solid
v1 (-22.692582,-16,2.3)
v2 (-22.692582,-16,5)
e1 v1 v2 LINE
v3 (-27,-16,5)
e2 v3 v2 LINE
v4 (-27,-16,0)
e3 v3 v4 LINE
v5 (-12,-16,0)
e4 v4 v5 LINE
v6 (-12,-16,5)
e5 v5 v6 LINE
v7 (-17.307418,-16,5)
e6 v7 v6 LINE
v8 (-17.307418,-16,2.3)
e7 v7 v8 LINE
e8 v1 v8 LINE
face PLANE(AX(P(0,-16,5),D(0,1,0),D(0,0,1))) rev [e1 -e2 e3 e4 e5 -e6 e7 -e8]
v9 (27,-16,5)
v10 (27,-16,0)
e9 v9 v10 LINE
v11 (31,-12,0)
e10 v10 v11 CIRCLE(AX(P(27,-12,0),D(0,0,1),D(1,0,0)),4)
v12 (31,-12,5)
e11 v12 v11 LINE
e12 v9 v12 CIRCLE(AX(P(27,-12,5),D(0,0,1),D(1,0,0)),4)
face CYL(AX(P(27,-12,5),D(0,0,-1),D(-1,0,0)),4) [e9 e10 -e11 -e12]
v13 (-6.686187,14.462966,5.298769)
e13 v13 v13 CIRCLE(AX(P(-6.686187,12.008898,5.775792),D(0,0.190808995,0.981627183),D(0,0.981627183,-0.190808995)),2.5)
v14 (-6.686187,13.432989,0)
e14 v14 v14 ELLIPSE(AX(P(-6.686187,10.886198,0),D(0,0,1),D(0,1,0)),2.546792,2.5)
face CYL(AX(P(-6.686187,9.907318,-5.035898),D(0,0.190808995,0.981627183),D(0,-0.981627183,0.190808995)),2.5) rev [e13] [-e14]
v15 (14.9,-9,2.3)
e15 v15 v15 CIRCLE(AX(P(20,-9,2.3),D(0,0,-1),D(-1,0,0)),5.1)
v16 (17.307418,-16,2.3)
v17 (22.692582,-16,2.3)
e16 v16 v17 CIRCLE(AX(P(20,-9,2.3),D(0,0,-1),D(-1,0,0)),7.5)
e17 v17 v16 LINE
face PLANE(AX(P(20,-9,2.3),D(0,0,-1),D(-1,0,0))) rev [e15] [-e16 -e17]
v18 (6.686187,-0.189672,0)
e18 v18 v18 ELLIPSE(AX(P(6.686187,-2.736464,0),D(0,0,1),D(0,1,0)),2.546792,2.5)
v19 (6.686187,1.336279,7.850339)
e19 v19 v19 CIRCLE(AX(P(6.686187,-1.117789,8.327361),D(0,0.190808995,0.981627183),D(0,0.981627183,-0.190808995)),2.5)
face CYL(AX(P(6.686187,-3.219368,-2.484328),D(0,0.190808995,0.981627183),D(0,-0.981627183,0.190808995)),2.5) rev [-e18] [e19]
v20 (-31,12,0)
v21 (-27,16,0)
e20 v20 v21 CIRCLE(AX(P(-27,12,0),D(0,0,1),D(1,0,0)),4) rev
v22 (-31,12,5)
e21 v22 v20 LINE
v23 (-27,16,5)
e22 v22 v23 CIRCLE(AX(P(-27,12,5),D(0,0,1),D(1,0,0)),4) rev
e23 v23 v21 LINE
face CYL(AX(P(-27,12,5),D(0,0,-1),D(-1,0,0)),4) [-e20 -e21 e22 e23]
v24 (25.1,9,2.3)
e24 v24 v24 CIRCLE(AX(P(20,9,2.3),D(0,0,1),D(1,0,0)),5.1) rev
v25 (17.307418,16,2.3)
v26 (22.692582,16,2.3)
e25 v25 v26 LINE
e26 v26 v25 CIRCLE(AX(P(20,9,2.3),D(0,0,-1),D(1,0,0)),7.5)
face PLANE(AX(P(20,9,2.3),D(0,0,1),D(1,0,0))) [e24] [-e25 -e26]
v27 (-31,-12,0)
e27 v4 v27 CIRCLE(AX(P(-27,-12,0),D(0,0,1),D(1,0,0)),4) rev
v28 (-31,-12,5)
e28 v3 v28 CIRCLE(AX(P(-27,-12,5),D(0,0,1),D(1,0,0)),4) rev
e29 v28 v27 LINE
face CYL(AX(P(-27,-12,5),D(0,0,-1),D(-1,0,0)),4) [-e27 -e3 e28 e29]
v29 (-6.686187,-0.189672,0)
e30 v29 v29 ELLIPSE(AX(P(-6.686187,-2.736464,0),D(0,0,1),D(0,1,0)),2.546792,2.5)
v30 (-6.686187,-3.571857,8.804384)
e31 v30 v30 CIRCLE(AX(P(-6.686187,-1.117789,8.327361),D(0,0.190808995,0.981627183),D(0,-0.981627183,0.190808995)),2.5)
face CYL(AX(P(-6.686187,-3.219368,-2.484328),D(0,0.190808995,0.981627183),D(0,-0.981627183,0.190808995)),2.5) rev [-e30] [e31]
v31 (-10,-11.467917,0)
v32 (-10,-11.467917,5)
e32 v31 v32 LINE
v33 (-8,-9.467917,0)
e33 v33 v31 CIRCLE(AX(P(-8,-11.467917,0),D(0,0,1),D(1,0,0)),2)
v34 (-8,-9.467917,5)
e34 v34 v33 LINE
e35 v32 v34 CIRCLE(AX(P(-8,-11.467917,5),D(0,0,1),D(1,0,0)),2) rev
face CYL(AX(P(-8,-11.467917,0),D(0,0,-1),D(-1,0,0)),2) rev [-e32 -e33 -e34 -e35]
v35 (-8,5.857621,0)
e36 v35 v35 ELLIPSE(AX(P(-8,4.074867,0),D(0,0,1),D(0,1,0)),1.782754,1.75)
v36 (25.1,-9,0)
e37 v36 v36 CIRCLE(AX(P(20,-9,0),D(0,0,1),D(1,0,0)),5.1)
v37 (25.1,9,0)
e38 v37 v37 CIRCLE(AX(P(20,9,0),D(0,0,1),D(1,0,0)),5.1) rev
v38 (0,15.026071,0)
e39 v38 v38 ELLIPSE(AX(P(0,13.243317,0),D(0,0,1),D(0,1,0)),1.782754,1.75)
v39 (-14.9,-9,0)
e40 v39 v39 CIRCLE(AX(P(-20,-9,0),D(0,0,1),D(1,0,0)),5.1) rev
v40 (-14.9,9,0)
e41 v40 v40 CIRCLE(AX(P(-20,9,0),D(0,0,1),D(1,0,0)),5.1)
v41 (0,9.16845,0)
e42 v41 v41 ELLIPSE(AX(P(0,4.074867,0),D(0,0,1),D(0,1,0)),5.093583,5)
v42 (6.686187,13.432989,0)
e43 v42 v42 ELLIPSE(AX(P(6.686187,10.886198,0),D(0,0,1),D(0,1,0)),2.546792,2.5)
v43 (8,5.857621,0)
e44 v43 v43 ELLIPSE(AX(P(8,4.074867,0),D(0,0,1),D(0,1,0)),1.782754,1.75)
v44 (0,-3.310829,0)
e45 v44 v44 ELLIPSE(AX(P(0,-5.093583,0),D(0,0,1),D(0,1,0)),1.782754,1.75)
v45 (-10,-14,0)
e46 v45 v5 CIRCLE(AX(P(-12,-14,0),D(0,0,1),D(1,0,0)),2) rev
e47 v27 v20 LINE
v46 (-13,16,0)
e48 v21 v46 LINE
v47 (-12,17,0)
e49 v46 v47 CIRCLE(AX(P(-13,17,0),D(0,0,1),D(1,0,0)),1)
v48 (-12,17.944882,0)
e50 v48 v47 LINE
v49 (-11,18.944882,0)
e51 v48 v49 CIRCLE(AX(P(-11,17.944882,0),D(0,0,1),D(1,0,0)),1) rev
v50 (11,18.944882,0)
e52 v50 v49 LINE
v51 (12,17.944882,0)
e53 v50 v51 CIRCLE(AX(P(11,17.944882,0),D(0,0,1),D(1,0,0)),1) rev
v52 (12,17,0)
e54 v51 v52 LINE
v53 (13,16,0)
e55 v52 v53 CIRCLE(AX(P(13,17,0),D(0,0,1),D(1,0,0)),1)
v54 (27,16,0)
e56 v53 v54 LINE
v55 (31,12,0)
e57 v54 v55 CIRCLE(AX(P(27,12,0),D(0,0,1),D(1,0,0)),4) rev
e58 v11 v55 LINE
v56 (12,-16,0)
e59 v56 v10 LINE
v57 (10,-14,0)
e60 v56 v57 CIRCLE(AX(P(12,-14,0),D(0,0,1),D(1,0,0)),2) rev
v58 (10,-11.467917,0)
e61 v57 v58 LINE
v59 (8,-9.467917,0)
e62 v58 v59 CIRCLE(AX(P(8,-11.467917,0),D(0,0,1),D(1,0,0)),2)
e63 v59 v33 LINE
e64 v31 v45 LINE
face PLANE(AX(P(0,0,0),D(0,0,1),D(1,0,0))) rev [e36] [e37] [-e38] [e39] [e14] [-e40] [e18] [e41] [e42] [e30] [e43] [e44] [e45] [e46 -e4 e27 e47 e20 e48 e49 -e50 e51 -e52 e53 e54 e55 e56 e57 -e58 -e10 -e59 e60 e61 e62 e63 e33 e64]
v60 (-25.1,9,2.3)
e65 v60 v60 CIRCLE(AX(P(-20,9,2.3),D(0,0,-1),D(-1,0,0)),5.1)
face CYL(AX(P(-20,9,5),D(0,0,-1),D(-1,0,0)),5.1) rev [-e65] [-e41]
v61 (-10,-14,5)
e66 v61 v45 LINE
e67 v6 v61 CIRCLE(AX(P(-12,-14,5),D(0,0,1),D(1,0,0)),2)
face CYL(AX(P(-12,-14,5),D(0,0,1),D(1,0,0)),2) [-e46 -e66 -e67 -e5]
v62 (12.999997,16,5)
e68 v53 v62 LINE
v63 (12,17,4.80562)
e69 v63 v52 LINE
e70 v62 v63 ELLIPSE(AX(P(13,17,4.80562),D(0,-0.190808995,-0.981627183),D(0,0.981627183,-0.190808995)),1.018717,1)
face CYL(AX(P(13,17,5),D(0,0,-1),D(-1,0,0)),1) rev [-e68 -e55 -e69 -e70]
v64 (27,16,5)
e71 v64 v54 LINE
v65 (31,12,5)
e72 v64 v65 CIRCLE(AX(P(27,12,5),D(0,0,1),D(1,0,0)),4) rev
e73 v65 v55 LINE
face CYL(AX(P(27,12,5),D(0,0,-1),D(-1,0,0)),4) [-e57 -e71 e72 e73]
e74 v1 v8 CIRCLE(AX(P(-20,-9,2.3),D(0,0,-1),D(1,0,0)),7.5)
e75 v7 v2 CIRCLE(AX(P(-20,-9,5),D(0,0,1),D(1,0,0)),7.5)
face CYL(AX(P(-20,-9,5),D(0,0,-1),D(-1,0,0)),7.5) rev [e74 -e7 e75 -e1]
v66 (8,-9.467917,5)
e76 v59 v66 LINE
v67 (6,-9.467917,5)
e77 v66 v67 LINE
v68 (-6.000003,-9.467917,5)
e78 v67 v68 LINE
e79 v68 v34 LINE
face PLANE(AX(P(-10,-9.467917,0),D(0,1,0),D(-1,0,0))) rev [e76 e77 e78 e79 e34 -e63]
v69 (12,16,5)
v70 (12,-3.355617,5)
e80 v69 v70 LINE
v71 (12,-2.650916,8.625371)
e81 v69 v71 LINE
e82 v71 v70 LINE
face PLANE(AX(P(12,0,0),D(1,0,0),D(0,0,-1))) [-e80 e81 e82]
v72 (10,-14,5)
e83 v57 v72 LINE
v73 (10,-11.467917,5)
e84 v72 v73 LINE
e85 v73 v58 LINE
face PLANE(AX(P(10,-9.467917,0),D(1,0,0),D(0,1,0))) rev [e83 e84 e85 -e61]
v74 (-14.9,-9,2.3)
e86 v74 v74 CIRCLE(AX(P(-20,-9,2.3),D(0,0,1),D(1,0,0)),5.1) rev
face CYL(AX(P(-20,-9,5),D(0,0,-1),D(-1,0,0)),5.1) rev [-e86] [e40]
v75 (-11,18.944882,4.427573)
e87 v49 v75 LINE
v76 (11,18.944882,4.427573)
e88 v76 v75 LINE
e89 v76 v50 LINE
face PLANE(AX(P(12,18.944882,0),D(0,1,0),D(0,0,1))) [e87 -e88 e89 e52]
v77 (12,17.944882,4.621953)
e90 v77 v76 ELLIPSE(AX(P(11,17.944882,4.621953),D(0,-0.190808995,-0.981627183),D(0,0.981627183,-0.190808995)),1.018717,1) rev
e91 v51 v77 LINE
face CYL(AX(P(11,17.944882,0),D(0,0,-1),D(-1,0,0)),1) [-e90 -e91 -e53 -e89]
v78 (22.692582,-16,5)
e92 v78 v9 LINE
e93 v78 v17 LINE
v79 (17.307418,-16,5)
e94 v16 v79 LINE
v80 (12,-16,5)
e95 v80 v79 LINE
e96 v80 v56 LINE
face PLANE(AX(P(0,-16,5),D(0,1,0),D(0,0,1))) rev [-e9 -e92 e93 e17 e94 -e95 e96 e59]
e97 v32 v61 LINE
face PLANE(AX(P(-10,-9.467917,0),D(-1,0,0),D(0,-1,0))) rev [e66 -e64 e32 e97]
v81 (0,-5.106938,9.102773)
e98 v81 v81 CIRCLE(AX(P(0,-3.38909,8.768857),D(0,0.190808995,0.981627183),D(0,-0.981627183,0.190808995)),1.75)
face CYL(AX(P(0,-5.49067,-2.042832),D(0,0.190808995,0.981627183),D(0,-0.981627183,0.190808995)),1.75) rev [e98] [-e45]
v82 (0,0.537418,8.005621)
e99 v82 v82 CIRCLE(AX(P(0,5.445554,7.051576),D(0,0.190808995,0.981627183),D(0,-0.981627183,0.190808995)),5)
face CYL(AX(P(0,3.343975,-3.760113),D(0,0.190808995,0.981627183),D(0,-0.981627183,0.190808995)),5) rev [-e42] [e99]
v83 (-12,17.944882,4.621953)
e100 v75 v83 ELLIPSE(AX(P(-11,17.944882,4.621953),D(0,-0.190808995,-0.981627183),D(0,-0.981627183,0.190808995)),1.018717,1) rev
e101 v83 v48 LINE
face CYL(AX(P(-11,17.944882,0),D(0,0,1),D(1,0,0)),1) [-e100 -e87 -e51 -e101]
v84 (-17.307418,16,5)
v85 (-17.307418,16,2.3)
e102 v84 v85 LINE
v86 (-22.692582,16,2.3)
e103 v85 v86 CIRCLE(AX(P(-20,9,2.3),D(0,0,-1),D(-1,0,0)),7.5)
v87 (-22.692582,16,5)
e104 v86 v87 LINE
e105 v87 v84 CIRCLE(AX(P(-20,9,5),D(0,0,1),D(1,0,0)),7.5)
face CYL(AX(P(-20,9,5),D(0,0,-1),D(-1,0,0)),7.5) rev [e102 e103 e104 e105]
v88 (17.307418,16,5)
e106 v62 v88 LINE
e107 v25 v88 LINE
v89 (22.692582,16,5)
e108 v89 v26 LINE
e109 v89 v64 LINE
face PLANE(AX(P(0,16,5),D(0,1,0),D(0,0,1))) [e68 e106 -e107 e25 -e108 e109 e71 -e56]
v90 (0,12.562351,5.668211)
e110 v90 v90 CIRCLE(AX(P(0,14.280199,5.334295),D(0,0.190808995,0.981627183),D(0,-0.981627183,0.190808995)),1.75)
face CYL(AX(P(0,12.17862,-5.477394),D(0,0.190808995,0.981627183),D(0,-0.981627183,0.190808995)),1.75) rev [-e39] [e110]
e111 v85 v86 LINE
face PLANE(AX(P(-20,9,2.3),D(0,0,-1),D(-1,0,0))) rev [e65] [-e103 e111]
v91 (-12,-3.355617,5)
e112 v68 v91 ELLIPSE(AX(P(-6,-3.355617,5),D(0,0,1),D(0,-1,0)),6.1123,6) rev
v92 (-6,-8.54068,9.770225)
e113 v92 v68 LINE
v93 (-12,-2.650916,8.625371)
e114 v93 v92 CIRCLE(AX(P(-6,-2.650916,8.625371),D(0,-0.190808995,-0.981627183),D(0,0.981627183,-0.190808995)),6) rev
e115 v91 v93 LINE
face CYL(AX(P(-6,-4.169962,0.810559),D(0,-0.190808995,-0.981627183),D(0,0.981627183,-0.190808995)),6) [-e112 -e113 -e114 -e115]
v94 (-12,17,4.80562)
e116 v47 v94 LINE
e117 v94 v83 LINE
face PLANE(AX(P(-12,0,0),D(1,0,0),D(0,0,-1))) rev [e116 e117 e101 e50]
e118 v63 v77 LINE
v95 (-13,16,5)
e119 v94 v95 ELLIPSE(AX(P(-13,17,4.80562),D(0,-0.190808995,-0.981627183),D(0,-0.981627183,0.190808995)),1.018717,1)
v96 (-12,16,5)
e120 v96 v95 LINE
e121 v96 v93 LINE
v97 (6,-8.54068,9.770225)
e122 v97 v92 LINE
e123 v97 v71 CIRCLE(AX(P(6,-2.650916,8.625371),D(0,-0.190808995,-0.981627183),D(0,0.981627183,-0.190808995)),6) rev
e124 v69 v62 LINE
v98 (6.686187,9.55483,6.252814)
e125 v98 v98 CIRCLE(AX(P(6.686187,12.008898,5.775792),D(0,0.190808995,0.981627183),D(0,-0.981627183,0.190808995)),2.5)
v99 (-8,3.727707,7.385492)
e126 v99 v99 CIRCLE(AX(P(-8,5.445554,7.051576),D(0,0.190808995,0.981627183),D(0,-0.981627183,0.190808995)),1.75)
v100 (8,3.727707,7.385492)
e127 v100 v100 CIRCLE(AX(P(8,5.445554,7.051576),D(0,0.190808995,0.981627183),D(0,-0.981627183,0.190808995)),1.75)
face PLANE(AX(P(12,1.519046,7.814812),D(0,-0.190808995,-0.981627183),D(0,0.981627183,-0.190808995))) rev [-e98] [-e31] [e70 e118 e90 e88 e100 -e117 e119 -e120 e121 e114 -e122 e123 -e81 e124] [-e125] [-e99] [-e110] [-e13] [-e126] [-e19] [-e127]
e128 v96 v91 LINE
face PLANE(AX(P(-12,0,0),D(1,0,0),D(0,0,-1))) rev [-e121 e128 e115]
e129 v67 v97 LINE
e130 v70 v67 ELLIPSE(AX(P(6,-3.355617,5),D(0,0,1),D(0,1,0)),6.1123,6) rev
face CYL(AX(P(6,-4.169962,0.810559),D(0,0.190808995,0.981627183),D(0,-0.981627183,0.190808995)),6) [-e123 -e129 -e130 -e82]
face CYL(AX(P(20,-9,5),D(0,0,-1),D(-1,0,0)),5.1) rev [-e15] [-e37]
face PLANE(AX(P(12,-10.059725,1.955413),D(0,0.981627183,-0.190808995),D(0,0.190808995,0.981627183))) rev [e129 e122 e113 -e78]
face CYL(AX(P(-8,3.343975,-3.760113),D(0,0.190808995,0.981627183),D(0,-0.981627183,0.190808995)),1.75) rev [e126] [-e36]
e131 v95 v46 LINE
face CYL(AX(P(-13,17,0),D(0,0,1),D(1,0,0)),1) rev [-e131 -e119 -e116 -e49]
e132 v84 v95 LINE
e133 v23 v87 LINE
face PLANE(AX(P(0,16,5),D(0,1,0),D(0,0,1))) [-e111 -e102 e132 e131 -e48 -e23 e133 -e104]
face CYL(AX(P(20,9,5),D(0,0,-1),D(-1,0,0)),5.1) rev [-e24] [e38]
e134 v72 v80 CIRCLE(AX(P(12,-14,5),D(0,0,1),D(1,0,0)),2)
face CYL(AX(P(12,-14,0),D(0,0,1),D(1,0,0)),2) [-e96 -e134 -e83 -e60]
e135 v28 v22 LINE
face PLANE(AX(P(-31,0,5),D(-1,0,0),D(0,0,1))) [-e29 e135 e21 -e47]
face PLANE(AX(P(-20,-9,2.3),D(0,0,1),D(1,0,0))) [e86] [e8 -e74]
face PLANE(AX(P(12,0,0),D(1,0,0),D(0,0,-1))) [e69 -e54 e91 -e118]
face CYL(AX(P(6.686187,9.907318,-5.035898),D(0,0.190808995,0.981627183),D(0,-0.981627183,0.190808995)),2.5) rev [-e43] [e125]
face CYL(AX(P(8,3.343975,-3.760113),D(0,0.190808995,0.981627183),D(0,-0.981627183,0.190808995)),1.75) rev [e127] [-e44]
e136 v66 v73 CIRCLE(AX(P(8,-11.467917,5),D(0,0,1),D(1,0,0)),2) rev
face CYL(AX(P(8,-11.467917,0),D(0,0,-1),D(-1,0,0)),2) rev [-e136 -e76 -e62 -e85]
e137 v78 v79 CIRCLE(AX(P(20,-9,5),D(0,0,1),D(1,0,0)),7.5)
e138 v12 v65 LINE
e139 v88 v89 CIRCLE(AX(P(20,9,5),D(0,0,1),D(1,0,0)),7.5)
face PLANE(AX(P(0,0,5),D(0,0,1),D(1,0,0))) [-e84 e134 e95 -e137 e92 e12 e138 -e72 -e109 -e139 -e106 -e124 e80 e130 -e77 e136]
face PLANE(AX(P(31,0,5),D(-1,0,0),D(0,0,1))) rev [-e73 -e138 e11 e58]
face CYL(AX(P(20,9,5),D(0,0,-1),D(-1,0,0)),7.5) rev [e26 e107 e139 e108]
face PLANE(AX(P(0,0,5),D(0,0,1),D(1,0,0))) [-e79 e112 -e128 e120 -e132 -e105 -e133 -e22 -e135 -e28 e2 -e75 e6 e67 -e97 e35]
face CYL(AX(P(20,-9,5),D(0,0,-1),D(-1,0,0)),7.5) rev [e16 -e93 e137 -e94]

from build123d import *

# Parameters (mm, degrees)
SKETCH1_R           = 5.1
BOSS_EXTRUDE1_DEPTH = 5
CUT_EXTRUDE1_START  = -2.3
SKETCH2_R           = 7.5
CUT_EXTRUDE1_DEPTH  = 33.942020373
BOSS_EXTRUDE2_DEPTH = 12
SKETCH4_R           = 5
SKETCH4_R_2         = 1.75
SKETCH4_R_3         = 2.5
CUT_EXTRUDE2_DEPTH  = 37.455291152
FILLET1_R           = 1
SKETCH5_W           = 20
SKETCH5_H           = 6.532082626
CUT_EXTRUDE3_DEPTH  = 37.672994655
FILLET2_R           = 2
FILLET3_R           = 6


with BuildPart() as part:
    # Sketch1 → Boss-Extrude1 (new body)
    with BuildSketch(Plane.XY):
        with BuildLine():
            Line((-27, -16), (27, -16))
            ThreePointArc((27, -16), (29.828427125, -14.828427125), (31, -12))
            Line((31, -12), (31, 12))
            ThreePointArc((31, 12), (29.828427125, 14.828427125), (27, 16))
            Line((27, 16), (-27, 16))
            ThreePointArc((-27, 16), (-29.828427125, 14.828427125), (-31, 12))
            Line((-31, 12), (-31, -12))
            ThreePointArc((-31, -12), (-29.828427125, -14.828427125), (-27, -16))
        make_face()
        with Locations((-20, 9)):
            Circle(SKETCH1_R, mode=Mode.SUBTRACT)
        with Locations((20, -9)):
            Circle(SKETCH1_R, mode=Mode.SUBTRACT)
        with Locations((-20, -9)):
            Circle(SKETCH1_R, mode=Mode.SUBTRACT)
        with Locations((20, 9)):
            Circle(SKETCH1_R, mode=Mode.SUBTRACT)
    extrude(amount=BOSS_EXTRUDE1_DEPTH)

    # Sketch2 → Cut-Extrude1 (cut, through all)
    with BuildSketch(Plane(origin=(0, 0, 0), x_dir=(-1, 0, 0), z_dir=(0, 0, -1)).offset(CUT_EXTRUDE1_START)):
        with Locations((20, 9)):
            Circle(SKETCH2_R)
        with Locations((-20, 9)):
            Circle(SKETCH2_R)
        with Locations((-20, -9)):
            Circle(SKETCH2_R)
        with Locations((20, -9)):
            Circle(SKETCH2_R)
    extrude(amount=-CUT_EXTRUDE1_DEPTH, mode=Mode.SUBTRACT)

    # Sketch3 → Boss-Extrude2 (add, symmetric)
    with BuildSketch(Plane(origin=(0, 0, 0), x_dir=(0, 0, -1), z_dir=(1, 0, 0))):
        Polygon((-5, 16), (-9.770224884, -8.540679586), (-5, -9.467917374), align=None)
        Polygon((0, 16), (-5, 16), (-4.427573014, 18.94488155), (0, 18.94488155), align=None)
    extrude(amount=BOSS_EXTRUDE2_DEPTH, both=True)

    # Sketch4 → Cut-Extrude2 (cut, through all)
    with BuildSketch(Plane(origin=(0, 1.519045647, 7.814812384), x_dir=(1, 0, 0), z_dir=(0, 0.19080899537654522, 0.981627183447664))):
        with Locations(Location((0, 4, 0), (0, 0, 270))):
            Circle(SKETCH4_R)
        with Locations(Location((0, 13, 0), (0, 0, 270))):
            Circle(SKETCH4_R_2)
        with Locations(Location((8, 4, 0), (0, 0, 270))):
            Circle(SKETCH4_R_2)
        with Locations(Location((0, -5, 0), (0, 0, 270))):
            Circle(SKETCH4_R_2)
        with Locations(Location((-8, 4, 0), (0, 0, 270))):
            Circle(SKETCH4_R_2)
        with Locations(Location((-6.686187475, -2.686187475, 0), (0, 0, 270))):
            Circle(SKETCH4_R_3)
        with Locations(Location((6.686187475, -2.686187475, 0), (0, 0, 90))):
            Circle(SKETCH4_R_3)
        with Locations(Location((6.686187475, 10.686187475, 0), (0, 0, 270))):
            Circle(SKETCH4_R_3)
        with Locations(Location((-6.686187475, 10.686187475, 0), (0, 0, 90))):
            Circle(SKETCH4_R_3)
    extrude(amount=-CUT_EXTRUDE2_DEPTH, mode=Mode.SUBTRACT)

    # Fillet1
    # the kernel refuses this fillet: 1 mm, written as the material it adds along each edge
    with BuildSketch(Plane(origin=(12, 16, 0), x_dir=(1, 0, 0), z_dir=(0, 0, 1))) as fillet1_piece_1_section:
        with BuildLine():
            CenterArc((FILLET1_R, FILLET1_R), FILLET1_R, 180, 90)
            Line((0, FILLET1_R), (0, 0))
            Line((0, 0), (FILLET1_R, 0))
        make_face()
    fillet1_piece_1 = extrude(amount=5, mode=Mode.PRIVATE)
    fillet1_piece_1 = split(fillet1_piece_1, bisect_by=Plane(origin=(12.227463764, 16.688764384, 4.866117766), z_dir=(0, -0.19080899537654517, -0.981627183447664)), keep=Keep.TOP, mode=Mode.PRIVATE)
    add(fillet1_piece_1)
    with BuildSketch(Plane(origin=(-12, 16, 0), x_dir=(-1, 0, 0), z_dir=(0, 0, 1))) as fillet1_piece_2_section:
        with BuildLine():
            CenterArc((FILLET1_R, -FILLET1_R), FILLET1_R, 90, 90)
            Line((0, -FILLET1_R), (0, 0))
            Line((0, 0), (FILLET1_R, 0))
        make_face()
    fillet1_piece_2 = extrude(amount=5, mode=Mode.PRIVATE)
    fillet1_piece_2 = split(fillet1_piece_2, bisect_by=Plane(origin=(-12.227463764, 16.688764384, 4.866117766), z_dir=(0, -0.19080899537654517, -0.981627183447664)), keep=Keep.TOP, mode=Mode.PRIVATE)
    add(fillet1_piece_2)
    # the kernel refuses this fillet: 1 mm, written as the material it takes off along each edge
    with BuildSketch(Plane(origin=(12, 18.94488155, 6.927573014), x_dir=(0, -1, 0), z_dir=(0, 0, -1))) as fillet1_2_piece_1:
        with BuildLine():
            CenterArc((FILLET1_R, FILLET1_R), FILLET1_R, 180, 90)
            Line((0, FILLET1_R), (0, 0))
            Line((0, 0), (FILLET1_R, 0))
        make_face()
    extrude(amount=9.427573014, mode=Mode.SUBTRACT)
    with BuildSketch(Plane(origin=(-12, 18.94488155, 6.927573014), x_dir=(0, -1, 0), z_dir=(0, 0, -1))) as fillet1_2_piece_2:
        with BuildLine():
            CenterArc((FILLET1_R, -FILLET1_R), FILLET1_R, 90, 90)
            Line((0, -FILLET1_R), (0, 0))
            Line((0, 0), (FILLET1_R, 0))
        make_face()
    extrude(amount=9.427573014, mode=Mode.SUBTRACT)

    # Sketch5 → Cut-Extrude3 (cut, through all)
    with BuildSketch(Plane.XY.offset(5)):
        with Locations((0, -12.733958687)):
            Rectangle(SKETCH5_W, SKETCH5_H)
    extrude(amount=-CUT_EXTRUDE3_DEPTH, mode=Mode.SUBTRACT)

    # Fillet2
    fillet2_edges = [part.edges().sort_by_distance(p)[0] for p in [
        (-10, -16, 2.5),
        (-10, -9.467917374, 2.5),
        (10, -9.467917374, 2.5),
        (10, -16, 2.5),
    ]]
    fillet(fillet2_edges, radius=FILLET2_R)

    # Fillet3
    # the kernel refuses this fillet: 6 mm, written as the material it takes off along each edge
    with BuildSketch(Plane(origin=(-12, -5.678544656, 24.494632636), x_dir=(1, 0, 0), z_dir=(0, -0.19080899537654505, -0.981627183447664))) as fillet3_piece_1_section:
        with BuildLine():
            CenterArc((FILLET3_R, -FILLET3_R), FILLET3_R, 90, 90)
            Line((0, -FILLET3_R), (0, 0))
            Line((0, 0), (FILLET3_R, 0))
        make_face()
    fillet3_piece_1 = extrude(amount=34.859507728, mode=Mode.PRIVATE)
    fillet3_piece_1 = split(fillet3_piece_1, bisect_by=Plane(origin=(-10.628321285, -7.717365946, 5), z_dir=(0, 0, 1)), keep=Keep.TOP, mode=Mode.PRIVATE)
    add(fillet3_piece_1, mode=Mode.SUBTRACT)
    with BuildSketch(Plane(origin=(12, -5.678544656, 24.494632636), x_dir=(-1, 0, 0), z_dir=(0, -0.19080899537654505, -0.981627183447664))) as fillet3_piece_2_section:
        with BuildLine():
            CenterArc((FILLET3_R, FILLET3_R), FILLET3_R, 180, 90)
            Line((0, FILLET3_R), (0, 0))
            Line((0, 0), (FILLET3_R, 0))
        make_face()
    fillet3_piece_2 = extrude(amount=34.859507728, mode=Mode.PRIVATE)
    fillet3_piece_2 = split(fillet3_piece_2, bisect_by=Plane(origin=(10.628321285, -7.717365946, 5), z_dir=(0, 0, 1)), keep=Keep.TOP, mode=Mode.PRIVATE)
    add(fillet3_piece_2, mode=Mode.SUBTRACT)


solid = part.part
